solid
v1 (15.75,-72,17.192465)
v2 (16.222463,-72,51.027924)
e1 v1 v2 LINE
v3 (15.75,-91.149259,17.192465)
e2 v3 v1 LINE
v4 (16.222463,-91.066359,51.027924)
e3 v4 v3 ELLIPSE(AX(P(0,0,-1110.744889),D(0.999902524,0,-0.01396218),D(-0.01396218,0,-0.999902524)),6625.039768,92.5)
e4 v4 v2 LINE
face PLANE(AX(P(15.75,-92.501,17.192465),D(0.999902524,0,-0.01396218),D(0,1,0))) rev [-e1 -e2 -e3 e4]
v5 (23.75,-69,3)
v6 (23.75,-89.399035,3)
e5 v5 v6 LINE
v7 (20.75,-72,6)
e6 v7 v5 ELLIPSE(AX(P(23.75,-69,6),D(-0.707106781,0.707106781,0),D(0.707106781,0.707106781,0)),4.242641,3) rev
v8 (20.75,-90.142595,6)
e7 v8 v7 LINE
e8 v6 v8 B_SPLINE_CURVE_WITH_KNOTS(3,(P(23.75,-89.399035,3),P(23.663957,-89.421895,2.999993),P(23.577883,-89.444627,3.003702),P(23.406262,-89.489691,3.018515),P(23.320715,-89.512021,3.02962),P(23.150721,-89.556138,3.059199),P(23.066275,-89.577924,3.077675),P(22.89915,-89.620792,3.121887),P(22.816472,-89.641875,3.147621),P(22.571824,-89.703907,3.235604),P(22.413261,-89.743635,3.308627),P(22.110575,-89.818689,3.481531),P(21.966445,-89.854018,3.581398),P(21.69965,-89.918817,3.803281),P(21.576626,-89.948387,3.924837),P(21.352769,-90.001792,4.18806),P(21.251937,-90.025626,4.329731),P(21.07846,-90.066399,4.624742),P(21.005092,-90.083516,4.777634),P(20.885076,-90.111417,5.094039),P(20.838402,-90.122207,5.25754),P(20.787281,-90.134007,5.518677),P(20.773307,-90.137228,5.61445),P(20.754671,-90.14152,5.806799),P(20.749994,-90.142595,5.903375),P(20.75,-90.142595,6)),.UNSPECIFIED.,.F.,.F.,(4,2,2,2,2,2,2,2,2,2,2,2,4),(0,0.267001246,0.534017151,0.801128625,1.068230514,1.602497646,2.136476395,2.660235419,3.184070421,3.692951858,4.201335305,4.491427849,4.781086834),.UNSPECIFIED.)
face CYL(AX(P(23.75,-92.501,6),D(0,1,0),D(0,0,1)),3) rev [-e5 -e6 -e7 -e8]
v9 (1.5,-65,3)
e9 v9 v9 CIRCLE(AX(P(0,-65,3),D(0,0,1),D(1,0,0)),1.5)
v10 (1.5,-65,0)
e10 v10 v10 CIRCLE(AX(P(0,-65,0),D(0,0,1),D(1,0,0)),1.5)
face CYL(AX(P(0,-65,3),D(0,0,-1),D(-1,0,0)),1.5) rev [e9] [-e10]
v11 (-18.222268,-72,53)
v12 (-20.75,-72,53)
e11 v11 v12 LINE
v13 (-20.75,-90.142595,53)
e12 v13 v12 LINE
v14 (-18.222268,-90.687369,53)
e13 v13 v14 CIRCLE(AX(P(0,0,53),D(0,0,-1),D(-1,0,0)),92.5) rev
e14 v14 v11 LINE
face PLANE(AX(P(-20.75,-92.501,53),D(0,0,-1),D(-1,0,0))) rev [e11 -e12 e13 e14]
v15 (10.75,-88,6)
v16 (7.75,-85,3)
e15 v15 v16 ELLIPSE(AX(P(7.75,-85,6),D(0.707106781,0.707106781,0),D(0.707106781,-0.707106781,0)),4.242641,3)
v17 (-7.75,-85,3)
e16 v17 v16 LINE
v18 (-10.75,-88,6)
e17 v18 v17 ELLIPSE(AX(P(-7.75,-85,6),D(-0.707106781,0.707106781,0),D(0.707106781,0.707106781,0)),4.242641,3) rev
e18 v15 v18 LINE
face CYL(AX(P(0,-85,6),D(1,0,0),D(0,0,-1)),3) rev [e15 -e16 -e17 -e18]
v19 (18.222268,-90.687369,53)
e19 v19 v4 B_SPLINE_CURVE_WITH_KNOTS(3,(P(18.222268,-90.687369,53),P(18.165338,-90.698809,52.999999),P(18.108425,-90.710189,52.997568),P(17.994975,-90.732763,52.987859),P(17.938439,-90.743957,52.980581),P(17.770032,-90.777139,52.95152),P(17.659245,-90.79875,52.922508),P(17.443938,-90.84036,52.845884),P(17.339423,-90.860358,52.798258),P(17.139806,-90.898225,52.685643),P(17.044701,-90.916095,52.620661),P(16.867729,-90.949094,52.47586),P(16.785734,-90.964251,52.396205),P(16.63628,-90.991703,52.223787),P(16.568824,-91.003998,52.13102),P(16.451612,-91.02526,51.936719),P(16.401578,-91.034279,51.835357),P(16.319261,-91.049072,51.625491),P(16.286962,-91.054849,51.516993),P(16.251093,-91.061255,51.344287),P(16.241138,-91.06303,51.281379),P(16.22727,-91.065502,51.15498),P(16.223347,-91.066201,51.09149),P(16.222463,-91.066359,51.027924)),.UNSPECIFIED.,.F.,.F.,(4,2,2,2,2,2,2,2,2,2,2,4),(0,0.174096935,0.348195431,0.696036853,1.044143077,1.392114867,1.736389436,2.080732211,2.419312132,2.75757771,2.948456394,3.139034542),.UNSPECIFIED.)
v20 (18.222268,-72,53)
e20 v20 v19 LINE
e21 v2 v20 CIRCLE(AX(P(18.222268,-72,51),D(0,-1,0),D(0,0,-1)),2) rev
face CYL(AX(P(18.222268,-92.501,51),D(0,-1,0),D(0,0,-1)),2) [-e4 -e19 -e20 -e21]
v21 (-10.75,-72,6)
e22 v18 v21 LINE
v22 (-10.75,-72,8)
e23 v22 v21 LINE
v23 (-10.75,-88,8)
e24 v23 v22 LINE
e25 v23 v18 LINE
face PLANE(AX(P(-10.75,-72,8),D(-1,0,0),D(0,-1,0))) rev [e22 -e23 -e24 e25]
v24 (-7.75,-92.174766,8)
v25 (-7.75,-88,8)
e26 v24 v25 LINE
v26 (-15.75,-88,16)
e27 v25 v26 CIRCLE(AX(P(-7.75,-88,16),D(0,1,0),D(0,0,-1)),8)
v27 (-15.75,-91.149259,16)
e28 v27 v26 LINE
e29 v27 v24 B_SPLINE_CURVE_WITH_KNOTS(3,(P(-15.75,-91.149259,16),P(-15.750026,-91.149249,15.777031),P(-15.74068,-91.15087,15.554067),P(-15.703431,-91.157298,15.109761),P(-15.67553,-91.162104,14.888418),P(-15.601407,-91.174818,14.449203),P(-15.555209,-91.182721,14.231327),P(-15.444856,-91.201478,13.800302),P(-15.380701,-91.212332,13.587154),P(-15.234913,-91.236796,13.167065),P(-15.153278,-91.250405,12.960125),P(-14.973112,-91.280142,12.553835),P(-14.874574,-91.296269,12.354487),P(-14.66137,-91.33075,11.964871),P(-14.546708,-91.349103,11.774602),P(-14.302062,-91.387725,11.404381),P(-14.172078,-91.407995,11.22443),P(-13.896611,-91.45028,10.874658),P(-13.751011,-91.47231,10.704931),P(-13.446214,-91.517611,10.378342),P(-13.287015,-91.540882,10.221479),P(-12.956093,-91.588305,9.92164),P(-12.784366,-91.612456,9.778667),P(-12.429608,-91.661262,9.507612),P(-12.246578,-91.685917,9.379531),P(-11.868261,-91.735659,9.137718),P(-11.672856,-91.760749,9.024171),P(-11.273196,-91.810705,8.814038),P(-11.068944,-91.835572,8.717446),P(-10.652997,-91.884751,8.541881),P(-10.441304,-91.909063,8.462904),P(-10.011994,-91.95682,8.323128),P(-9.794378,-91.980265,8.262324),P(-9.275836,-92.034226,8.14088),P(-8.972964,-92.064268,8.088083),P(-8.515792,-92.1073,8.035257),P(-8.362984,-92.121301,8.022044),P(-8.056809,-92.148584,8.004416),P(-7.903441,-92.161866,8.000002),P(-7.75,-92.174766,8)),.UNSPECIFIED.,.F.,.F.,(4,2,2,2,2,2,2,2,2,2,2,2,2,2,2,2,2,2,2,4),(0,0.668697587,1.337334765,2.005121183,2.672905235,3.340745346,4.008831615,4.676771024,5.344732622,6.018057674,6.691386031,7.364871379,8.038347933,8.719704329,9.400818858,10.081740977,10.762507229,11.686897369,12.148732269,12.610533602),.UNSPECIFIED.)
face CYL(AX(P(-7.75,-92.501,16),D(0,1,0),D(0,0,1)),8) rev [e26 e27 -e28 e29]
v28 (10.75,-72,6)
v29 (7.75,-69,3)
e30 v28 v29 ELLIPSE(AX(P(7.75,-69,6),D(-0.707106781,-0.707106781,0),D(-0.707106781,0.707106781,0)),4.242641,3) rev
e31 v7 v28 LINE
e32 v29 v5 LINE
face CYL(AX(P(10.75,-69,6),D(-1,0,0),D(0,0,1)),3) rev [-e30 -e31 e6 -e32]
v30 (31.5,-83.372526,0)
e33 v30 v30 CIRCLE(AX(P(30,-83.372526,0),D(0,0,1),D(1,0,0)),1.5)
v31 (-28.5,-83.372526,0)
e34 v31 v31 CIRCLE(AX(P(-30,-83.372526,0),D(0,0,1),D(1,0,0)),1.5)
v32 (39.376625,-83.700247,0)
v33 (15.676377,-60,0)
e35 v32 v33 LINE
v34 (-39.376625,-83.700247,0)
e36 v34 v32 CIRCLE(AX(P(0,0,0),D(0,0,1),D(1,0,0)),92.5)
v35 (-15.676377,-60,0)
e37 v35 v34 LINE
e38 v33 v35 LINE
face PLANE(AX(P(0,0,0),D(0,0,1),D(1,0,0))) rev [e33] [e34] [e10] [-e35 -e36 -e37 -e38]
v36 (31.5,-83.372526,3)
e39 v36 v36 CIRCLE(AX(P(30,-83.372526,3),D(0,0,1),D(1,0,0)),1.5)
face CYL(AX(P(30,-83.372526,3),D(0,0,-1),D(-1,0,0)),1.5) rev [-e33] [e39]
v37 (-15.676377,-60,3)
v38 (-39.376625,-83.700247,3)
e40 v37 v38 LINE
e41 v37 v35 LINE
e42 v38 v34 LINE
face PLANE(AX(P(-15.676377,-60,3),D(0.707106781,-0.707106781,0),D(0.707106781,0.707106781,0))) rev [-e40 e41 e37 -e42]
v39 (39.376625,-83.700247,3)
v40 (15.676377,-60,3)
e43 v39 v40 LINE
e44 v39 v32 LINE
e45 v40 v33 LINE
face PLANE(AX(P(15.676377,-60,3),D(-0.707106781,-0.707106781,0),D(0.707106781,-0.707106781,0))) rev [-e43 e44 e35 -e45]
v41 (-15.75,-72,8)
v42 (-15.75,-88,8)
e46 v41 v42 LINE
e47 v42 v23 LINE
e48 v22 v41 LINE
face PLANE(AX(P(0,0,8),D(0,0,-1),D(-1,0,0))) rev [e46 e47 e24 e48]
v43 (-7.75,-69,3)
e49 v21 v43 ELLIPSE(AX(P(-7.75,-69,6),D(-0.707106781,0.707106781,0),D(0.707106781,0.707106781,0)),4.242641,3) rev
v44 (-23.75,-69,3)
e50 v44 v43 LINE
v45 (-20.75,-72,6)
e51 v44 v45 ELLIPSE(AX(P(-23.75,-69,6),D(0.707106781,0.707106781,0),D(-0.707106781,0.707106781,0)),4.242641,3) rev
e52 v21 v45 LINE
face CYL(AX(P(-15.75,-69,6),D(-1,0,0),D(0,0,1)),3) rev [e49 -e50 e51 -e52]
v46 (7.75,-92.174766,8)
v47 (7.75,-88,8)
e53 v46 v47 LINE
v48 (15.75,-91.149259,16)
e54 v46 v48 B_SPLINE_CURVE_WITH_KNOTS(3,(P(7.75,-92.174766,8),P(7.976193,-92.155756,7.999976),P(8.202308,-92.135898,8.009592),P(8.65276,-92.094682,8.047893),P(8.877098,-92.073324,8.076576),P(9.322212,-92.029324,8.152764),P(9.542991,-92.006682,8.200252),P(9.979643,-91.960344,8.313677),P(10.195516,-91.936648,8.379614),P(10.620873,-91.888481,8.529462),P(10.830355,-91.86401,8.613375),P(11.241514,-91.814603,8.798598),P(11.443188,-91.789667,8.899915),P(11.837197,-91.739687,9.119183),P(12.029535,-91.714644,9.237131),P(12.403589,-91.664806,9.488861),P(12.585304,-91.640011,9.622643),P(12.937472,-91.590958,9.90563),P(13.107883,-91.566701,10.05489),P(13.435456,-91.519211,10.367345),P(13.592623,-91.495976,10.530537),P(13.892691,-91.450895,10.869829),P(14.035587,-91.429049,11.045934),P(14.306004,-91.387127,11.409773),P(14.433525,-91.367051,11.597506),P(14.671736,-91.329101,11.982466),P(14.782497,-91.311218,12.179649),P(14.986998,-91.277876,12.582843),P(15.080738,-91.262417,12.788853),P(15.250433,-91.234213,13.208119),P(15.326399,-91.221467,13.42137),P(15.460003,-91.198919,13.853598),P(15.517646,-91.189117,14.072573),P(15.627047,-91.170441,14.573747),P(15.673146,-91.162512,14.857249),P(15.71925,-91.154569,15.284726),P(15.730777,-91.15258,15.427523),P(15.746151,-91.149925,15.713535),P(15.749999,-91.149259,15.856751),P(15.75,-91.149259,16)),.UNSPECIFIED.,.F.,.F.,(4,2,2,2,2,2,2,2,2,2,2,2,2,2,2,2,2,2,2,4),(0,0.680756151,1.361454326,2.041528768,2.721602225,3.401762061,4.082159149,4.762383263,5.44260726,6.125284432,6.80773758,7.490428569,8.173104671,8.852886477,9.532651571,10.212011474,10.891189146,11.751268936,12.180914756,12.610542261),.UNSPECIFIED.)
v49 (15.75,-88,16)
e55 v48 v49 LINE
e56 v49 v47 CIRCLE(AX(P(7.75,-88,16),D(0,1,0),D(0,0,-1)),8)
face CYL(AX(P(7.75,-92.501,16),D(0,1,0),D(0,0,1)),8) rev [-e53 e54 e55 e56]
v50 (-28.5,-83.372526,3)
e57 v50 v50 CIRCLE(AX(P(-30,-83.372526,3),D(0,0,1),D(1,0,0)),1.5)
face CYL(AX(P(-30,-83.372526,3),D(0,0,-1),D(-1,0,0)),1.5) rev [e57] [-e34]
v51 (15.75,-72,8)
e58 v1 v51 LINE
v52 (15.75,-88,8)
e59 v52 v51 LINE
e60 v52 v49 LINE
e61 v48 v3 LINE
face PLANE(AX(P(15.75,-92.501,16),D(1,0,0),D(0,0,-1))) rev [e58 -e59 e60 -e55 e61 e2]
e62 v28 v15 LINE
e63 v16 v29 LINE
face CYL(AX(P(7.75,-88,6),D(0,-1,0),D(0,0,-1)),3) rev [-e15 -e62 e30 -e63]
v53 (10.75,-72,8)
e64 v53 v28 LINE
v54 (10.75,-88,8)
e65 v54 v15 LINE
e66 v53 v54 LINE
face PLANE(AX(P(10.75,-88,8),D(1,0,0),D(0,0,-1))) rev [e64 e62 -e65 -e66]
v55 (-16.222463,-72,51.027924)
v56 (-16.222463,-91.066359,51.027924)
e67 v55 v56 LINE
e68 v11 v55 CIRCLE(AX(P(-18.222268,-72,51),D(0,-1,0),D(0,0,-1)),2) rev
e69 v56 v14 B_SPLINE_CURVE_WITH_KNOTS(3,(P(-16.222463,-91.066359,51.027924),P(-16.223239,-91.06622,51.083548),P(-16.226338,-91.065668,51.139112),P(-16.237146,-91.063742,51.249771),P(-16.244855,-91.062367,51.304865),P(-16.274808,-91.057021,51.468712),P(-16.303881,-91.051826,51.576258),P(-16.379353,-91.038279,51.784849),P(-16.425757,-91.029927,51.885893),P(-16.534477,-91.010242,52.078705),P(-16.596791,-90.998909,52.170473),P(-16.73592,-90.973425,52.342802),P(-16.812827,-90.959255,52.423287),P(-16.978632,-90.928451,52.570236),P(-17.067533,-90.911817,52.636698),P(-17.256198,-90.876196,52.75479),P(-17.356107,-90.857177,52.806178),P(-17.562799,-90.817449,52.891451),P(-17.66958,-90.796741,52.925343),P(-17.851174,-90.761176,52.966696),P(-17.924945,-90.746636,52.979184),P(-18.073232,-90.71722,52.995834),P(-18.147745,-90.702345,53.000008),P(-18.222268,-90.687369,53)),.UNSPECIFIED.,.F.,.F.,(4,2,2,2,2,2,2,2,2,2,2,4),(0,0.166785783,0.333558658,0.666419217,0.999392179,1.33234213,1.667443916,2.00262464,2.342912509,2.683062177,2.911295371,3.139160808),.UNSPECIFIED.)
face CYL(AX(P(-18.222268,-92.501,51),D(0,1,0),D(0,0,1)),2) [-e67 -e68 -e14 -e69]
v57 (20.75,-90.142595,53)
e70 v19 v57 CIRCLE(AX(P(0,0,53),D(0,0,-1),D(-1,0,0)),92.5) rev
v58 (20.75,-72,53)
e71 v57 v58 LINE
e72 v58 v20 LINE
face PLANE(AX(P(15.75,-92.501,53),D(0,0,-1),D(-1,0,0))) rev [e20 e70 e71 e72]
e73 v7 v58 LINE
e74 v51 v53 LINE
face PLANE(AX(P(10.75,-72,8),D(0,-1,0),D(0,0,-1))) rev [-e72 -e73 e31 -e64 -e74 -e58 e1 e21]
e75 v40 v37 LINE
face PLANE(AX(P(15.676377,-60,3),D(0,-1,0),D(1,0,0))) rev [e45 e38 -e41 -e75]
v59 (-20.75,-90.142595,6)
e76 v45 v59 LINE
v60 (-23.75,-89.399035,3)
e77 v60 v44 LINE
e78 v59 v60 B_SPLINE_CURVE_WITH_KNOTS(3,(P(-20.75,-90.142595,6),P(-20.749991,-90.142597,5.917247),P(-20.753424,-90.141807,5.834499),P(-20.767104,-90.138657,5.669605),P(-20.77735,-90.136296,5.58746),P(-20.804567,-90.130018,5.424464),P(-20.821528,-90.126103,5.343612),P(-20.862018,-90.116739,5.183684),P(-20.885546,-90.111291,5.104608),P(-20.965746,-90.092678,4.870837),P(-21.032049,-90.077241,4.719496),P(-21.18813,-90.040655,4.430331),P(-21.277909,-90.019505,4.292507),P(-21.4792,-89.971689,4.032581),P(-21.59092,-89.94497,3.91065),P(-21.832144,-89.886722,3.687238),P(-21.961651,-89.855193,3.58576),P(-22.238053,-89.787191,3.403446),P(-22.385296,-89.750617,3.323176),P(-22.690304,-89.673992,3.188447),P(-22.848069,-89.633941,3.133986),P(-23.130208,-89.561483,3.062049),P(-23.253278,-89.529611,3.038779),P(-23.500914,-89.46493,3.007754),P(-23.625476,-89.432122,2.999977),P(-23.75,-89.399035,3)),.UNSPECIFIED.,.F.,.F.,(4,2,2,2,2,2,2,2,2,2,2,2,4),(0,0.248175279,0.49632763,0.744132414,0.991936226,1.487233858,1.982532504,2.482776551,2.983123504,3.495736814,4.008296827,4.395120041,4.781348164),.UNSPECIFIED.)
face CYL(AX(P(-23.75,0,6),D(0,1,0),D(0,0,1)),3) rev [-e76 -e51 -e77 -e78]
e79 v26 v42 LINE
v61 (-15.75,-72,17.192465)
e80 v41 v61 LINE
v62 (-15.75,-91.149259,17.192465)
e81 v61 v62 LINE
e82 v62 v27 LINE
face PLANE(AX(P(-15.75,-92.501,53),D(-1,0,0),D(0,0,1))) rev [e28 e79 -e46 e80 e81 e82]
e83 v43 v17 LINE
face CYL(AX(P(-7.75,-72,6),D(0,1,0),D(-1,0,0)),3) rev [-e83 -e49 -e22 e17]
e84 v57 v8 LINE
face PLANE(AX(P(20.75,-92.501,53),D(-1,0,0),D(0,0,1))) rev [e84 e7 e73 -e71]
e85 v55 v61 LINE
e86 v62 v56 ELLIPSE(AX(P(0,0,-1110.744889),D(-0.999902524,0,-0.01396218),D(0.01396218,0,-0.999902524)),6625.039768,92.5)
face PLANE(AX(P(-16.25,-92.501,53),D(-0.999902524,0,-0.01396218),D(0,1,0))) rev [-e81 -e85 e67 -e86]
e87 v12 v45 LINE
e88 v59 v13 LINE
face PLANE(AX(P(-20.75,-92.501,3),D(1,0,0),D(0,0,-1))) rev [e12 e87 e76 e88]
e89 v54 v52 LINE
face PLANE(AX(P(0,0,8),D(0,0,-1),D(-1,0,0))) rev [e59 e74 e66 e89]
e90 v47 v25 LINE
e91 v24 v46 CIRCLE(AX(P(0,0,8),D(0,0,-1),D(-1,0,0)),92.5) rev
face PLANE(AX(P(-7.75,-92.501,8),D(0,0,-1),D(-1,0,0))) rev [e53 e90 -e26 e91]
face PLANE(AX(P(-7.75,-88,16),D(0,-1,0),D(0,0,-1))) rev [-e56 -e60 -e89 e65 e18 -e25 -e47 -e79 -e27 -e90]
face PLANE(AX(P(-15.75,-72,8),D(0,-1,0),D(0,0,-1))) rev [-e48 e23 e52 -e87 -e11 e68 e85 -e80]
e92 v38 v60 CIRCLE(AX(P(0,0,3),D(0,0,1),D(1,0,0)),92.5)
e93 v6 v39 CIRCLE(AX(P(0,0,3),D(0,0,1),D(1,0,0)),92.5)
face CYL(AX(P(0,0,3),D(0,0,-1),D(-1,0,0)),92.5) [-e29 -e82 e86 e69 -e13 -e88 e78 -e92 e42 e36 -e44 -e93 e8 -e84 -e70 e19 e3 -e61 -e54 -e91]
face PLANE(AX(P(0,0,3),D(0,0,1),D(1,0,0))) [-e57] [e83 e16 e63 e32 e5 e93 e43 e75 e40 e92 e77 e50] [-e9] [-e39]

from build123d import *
from OCP.BRepFilletAPI import BRepFilletAPI_MakeChamfer

# Parameters (mm, degrees)
CROQUIS1_R                   = 1.5
SALIENTE_EXTRUIR1_DEPTH      = 3
SALIENTE_EXTRUIR2_DEPTH      = 5
SALIENTE_EXTRUIR3_REACH      = 50.975
SALIENTE_EXTRUIR3_END_RADIUS = 92.5
CROQUIS5_W                   = 5
CROQUIS5_H                   = 50
SALIENTE_EXTRUIR4_DEPTH      = 16
CHAFL_N1_SIZE                = 0.5
CHAFL_N1_SIZE2               = 35.80753506
REDONDEO1_R                  = 2
REDONDEO2_R                  = 3


with BuildPart() as part:
    # Croquis1 → Saliente-Extruir1 (new body)
    with BuildSketch(Plane.XY):
        with BuildLine():
            Line((15.676377407, -60), (-15.676377407, -60))
            Line((-15.676377407, -60), (-39.376624823, -83.700247416))
            ThreePointArc((-39.376624823, -83.700247416), (0, -92.5), (39.376624823, -83.700247416))
            Line((39.376624823, -83.700247416), (15.676377407, -60))
        make_face()
        with Locations((-30, -83.372525695)):
            Circle(CROQUIS1_R, mode=Mode.SUBTRACT)
        with Locations((30, -83.372525695)):
            Circle(CROQUIS1_R, mode=Mode.SUBTRACT)
        with Locations((0, -65)):
            Circle(CROQUIS1_R, mode=Mode.SUBTRACT)
    extrude(amount=SALIENTE_EXTRUIR1_DEPTH)

    # Croquis2 → Saliente-Extruir2 (add)
    with BuildSketch(Plane.XY.offset(3)):
        Polygon((-15.75, -80), (-15.75, -72), (-10.75, -72), (-10.75, -88), (-15.75, -88), align=None)
        Polygon((15.75, -80), (15.75, -88), (10.75, -88), (10.75, -72), (15.75, -72), align=None)
    extrude(amount=SALIENTE_EXTRUIR2_DEPTH)

    # Saliente-Extruir3: up to this cylinder (the profile starts inside it)
    saliente_extruir3_end = Plane(origin=(0, 0, 34.5), z_dir=(0, 0, -1)) * Cylinder(SALIENTE_EXTRUIR3_END_RADIUS, 287.95, mode=Mode.PRIVATE)
    # Croquis4 → Saliente-Extruir3 (add, up to the surface)
    with BuildSketch(Plane.XZ.offset(88), mode=Mode.PRIVATE) as saliente_extruir3_sk1:
        with BuildLine():
            Line((-15.75, 3), (-20.75, 3))
            Line((-20.75, 3), (-20.75, 53))
            Line((-20.75, 53), (-15.75, 53))
            Line((-15.75, 53), (-15.75, 16))
            ThreePointArc((-15.75, 16), (-13.406854249, 10.343145751), (-7.75, 8))
            Line((-7.75, 8), (7.75, 8))
            ThreePointArc((7.75, 8), (13.406854249, 10.343145751), (15.75, 16))
            Line((15.75, 16), (15.75, 53))
            Line((15.75, 53), (20.75, 53))
            Line((20.75, 53), (20.75, 3))
            Line((20.75, 3), (-15.75, 3))
        make_face()
    saliente_extruir3_tool1 = extrude(saliente_extruir3_sk1.sketch, amount=SALIENTE_EXTRUIR3_REACH, mode=Mode.PRIVATE) & saliente_extruir3_end
    add(saliente_extruir3_tool1.solids().sort_by_distance((16.399788, -88, 34.5))[0])

    # Croquis5 → Saliente-Extruir4 (add)
    with BuildSketch(Plane(origin=(0, -88, 0), x_dir=(1, 0, 0), z_dir=(0, 1, 0))):
        with Locations((-18.25, -28)):
            Rectangle(CROQUIS5_W, CROQUIS5_H)
        with Locations((18.25, -28)):
            Rectangle(CROQUIS5_W, CROQUIS5_H)
    extrude(amount=SALIENTE_EXTRUIR4_DEPTH)

    # Chaflán1: one chamfer whose edges measure the first distance from different faces: ONE call of the kernel's chamfer builder (chamfer() names one face for all edges)
    chafl_n1_edges_1 = [part.edges().sort_by_distance(p)[0] for p in [
        (-15.75, -80, 53),
    ]]
    chafl_n1_side_1 = [part.faces().sort_by_distance(p)[0] for p in [
        (-18.25, -80, 53),
    ]]
    chafl_n1_edges_2 = [part.edges().sort_by_distance(p)[0] for p in [
        (15.75, -80, 53),
    ]]
    chafl_n1_side_2 = [part.faces().sort_by_distance(p)[0] for p in [
        (18.25, -80, 53),
    ]]
    chafl_n1 = BRepFilletAPI_MakeChamfer(part.part.solid().wrapped)
    for e in chafl_n1_edges_1:
        chafl_n1.Add(CHAFL_N1_SIZE, CHAFL_N1_SIZE2, e.wrapped, chafl_n1_side_1[0].wrapped)  # the first distance lies on this face
    for e in chafl_n1_edges_2:
        chafl_n1.Add(CHAFL_N1_SIZE, CHAFL_N1_SIZE2, e.wrapped, chafl_n1_side_2[0].wrapped)  # the first distance lies on this face
    add(Compound.cast(chafl_n1.Shape()), mode=Mode.REPLACE)

    # Redondeo1
    redondeo1_edges = [part.edges().sort_by_distance(p)[0] for p in [
        (16.25, -80, 53),
        (-16.25, -80, 53),
    ]]
    fillet(redondeo1_edges, radius=REDONDEO1_R)

    # Redondeo2
    # the kernel refuses this fillet: 3 mm, written as the material it adds along each edge
    with BuildSketch(Plane(origin=(10.75, -72, 3), x_dir=(0, 1, 0), z_dir=(1, 0, 0)), Plane(origin=(-15.75, -72, 3), x_dir=(0, 1, 0), z_dir=(1, 0, 0)), Plane(origin=(-20.75, -72, 3), x_dir=(0, 1, 0), z_dir=(1, 0, 0)), Plane(origin=(15.75, -72, 3), x_dir=(0, 1, 0), z_dir=(1, 0, 0))) as redondeo2_piece_1:
        with BuildLine():
            CenterArc((REDONDEO2_R, REDONDEO2_R), REDONDEO2_R, 180, 90)
            Line((0, REDONDEO2_R), (-REDONDEO2_R * 0.02, REDONDEO2_R))
            Line((-REDONDEO2_R * 0.02, REDONDEO2_R), (-REDONDEO2_R * 0.02, -REDONDEO2_R * 0.02))
            Line((-REDONDEO2_R * 0.02, -REDONDEO2_R * 0.02), (REDONDEO2_R, -REDONDEO2_R * 0.02))
            Line((REDONDEO2_R, -REDONDEO2_R * 0.02), (REDONDEO2_R, 0))
        make_face()
    extrude(amount=5)
    with BuildSketch(Plane(origin=(10.75, -88, 3), x_dir=(-1, 0, 0), z_dir=(0, 1, 0)), Plane(origin=(-10.75, -72, 3), x_dir=(1, 0, 0), z_dir=(0, -1, 0)), Plane(origin=(-20.75, -88, 3), x_dir=(-1, 0, 0), z_dir=(0, 1, 0)), Plane(origin=(20.75, -88, 3), x_dir=(0, 0, 1), z_dir=(0, 1, 0))) as redondeo2_piece_2:
        with BuildLine():
            CenterArc((REDONDEO2_R, REDONDEO2_R), REDONDEO2_R, 180, 90)
            Line((0, REDONDEO2_R), (-REDONDEO2_R * 0.02, REDONDEO2_R))
            Line((-REDONDEO2_R * 0.02, REDONDEO2_R), (-REDONDEO2_R * 0.02, -REDONDEO2_R * 0.02))
            Line((-REDONDEO2_R * 0.02, -REDONDEO2_R * 0.02), (REDONDEO2_R, -REDONDEO2_R * 0.02))
            Line((REDONDEO2_R, -REDONDEO2_R * 0.02), (REDONDEO2_R, 0))
        make_face()
    extrude(amount=16)
    with BuildSketch(Plane(origin=(-10.75, -88, 3), x_dir=(0, 1, 0), z_dir=(1, 0, 0))) as redondeo2_piece_3:
        with BuildLine():
            CenterArc((REDONDEO2_R, REDONDEO2_R), REDONDEO2_R, 180, 90)
            Line((0, REDONDEO2_R), (-REDONDEO2_R * 0.02, REDONDEO2_R))
            Line((-REDONDEO2_R * 0.02, REDONDEO2_R), (-REDONDEO2_R * 0.02, -REDONDEO2_R * 0.02))
            Line((-REDONDEO2_R * 0.02, -REDONDEO2_R * 0.02), (REDONDEO2_R, -REDONDEO2_R * 0.02))
            Line((REDONDEO2_R, -REDONDEO2_R * 0.02), (REDONDEO2_R, 0))
        make_face()
    extrude(amount=21.5)
    with BuildSketch(Plane(origin=(20.75, -88, 3), x_dir=(0, 0, 1), z_dir=(0, -1, 0))) as redondeo2_piece_4_section:
        with BuildLine():
            CenterArc((REDONDEO2_R, -REDONDEO2_R), REDONDEO2_R, 90, 90)
            Line((0, -REDONDEO2_R), (-REDONDEO2_R * 0.02, -REDONDEO2_R))
            Line((-REDONDEO2_R * 0.02, -REDONDEO2_R), (-REDONDEO2_R * 0.02, REDONDEO2_R * 0.02))
            Line((-REDONDEO2_R * 0.02, REDONDEO2_R * 0.02), (REDONDEO2_R, REDONDEO2_R * 0.02))
            Line((REDONDEO2_R, REDONDEO2_R * 0.02), (REDONDEO2_R, 0))
        make_face()
    redondeo2_piece_4 = extrude(amount=9.64259537, mode=Mode.PRIVATE)
    redondeo2_piece_4 = redondeo2_piece_4 & Plane(origin=(0, 0, 3.709191114), x_dir=(-1, 0, 0), z_dir=(0, 0, -1)) * Cylinder(92.5, 32, mode=Mode.PRIVATE)
    add(redondeo2_piece_4)
    with BuildSketch(Plane(origin=(-20.75, -88, 3), x_dir=(0, 0, 1), z_dir=(0, -1, 0))) as redondeo2_piece_5_section:
        with BuildLine():
            CenterArc((REDONDEO2_R, REDONDEO2_R), REDONDEO2_R, 180, 90)
            Line((0, REDONDEO2_R), (-REDONDEO2_R * 0.02, REDONDEO2_R))
            Line((-REDONDEO2_R * 0.02, REDONDEO2_R), (-REDONDEO2_R * 0.02, -REDONDEO2_R * 0.02))
            Line((-REDONDEO2_R * 0.02, -REDONDEO2_R * 0.02), (REDONDEO2_R, -REDONDEO2_R * 0.02))
            Line((REDONDEO2_R, -REDONDEO2_R * 0.02), (REDONDEO2_R, 0))
        make_face()
    redondeo2_piece_5 = extrude(amount=9.64259537, mode=Mode.PRIVATE)
    redondeo2_piece_5 = redondeo2_piece_5 & Plane(origin=(0, 0, 3.709191539), x_dir=(-1, 0, 0), z_dir=(0, 0, -1)) * Cylinder(92.5, 32, mode=Mode.PRIVATE)
    add(redondeo2_piece_5)
    with BuildSketch(Plane(origin=(3.25, -72, 3), x_dir=(0, 1, 0), z_dir=(1, 0, 0))) as redondeo2_piece_6a_section:
        with BuildLine():
            CenterArc((REDONDEO2_R, REDONDEO2_R), REDONDEO2_R, 180, 90)
            Line((0, REDONDEO2_R), (-REDONDEO2_R * 0.02, REDONDEO2_R))
            Line((-REDONDEO2_R * 0.02, REDONDEO2_R), (-REDONDEO2_R * 0.02, -REDONDEO2_R * 0.02))
            Line((-REDONDEO2_R * 0.02, -REDONDEO2_R * 0.02), (REDONDEO2_R, -REDONDEO2_R * 0.02))
            Line((REDONDEO2_R, -REDONDEO2_R * 0.02), (REDONDEO2_R, 0))
        make_face()
    redondeo2_piece_6a = extrude(amount=12.5, mode=Mode.PRIVATE)
    redondeo2_piece_6a = split(redondeo2_piece_6a, bisect_by=Plane(origin=(10.75, -71.320814657, 3.679185343), z_dir=(-1, 0, 0)), keep=Keep.TOP, mode=Mode.PRIVATE)
    with BuildSketch(Plane(origin=(10.75, -88, 3), x_dir=(-1, 0, 0), z_dir=(0, 1, 0))) as redondeo2_piece_6b_section:
        with BuildLine():
            CenterArc((REDONDEO2_R, REDONDEO2_R), REDONDEO2_R, 180, 90)
            Line((0, REDONDEO2_R), (-REDONDEO2_R * 0.02, REDONDEO2_R))
            Line((-REDONDEO2_R * 0.02, REDONDEO2_R), (-REDONDEO2_R * 0.02, -REDONDEO2_R * 0.02))
            Line((-REDONDEO2_R * 0.02, -REDONDEO2_R * 0.02), (REDONDEO2_R, -REDONDEO2_R * 0.02))
            Line((REDONDEO2_R, -REDONDEO2_R * 0.02), (REDONDEO2_R, 0))
        make_face()
    redondeo2_piece_6b = extrude(amount=23.5, mode=Mode.PRIVATE)
    redondeo2_piece_6b = split(redondeo2_piece_6b, bisect_by=Plane(origin=(10.070814657, -72, 3.679185343), z_dir=(0, 1, 0)), keep=Keep.TOP, mode=Mode.PRIVATE)
    redondeo2_piece_6 = redondeo2_piece_6a & redondeo2_piece_6b
    add(redondeo2_piece_6)
    with BuildSketch(Plane(origin=(10.75, -95.5, 3), x_dir=(-1, 0, 0), z_dir=(0, 1, 0))) as redondeo2_piece_7a_section:
        with BuildLine():
            CenterArc((REDONDEO2_R, REDONDEO2_R), REDONDEO2_R, 180, 90)
            Line((0, REDONDEO2_R), (-REDONDEO2_R * 0.02, REDONDEO2_R))
            Line((-REDONDEO2_R * 0.02, REDONDEO2_R), (-REDONDEO2_R * 0.02, -REDONDEO2_R * 0.02))
            Line((-REDONDEO2_R * 0.02, -REDONDEO2_R * 0.02), (REDONDEO2_R, -REDONDEO2_R * 0.02))
            Line((REDONDEO2_R, -REDONDEO2_R * 0.02), (REDONDEO2_R, 0))
        make_face()
    redondeo2_piece_7a = extrude(amount=23.5, mode=Mode.PRIVATE)
    redondeo2_piece_7a = split(redondeo2_piece_7a, bisect_by=Plane(origin=(10.070814657, -88, 3.679185343), z_dir=(0, -1, 0)), keep=Keep.TOP, mode=Mode.PRIVATE)
    with BuildSketch(Plane(origin=(-10.75, -88, 3), x_dir=(0, 1, 0), z_dir=(1, 0, 0))) as redondeo2_piece_7b_section:
        with BuildLine():
            CenterArc((REDONDEO2_R, REDONDEO2_R), REDONDEO2_R, 180, 90)
            Line((0, REDONDEO2_R), (-REDONDEO2_R * 0.02, REDONDEO2_R))
            Line((-REDONDEO2_R * 0.02, REDONDEO2_R), (-REDONDEO2_R * 0.02, -REDONDEO2_R * 0.02))
            Line((-REDONDEO2_R * 0.02, -REDONDEO2_R * 0.02), (REDONDEO2_R, -REDONDEO2_R * 0.02))
            Line((REDONDEO2_R, -REDONDEO2_R * 0.02), (REDONDEO2_R, 0))
        make_face()
    redondeo2_piece_7b = extrude(amount=29, mode=Mode.PRIVATE)
    redondeo2_piece_7b = split(redondeo2_piece_7b, bisect_by=Plane(origin=(10.75, -87.320814657, 3.679185343), z_dir=(1, 0, 0)), keep=Keep.TOP, mode=Mode.PRIVATE)
    redondeo2_piece_7 = redondeo2_piece_7a & redondeo2_piece_7b
    add(redondeo2_piece_7)
    with BuildSketch(Plane(origin=(-10.75, -64.5, 3), x_dir=(1, 0, 0), z_dir=(0, -1, 0))) as redondeo2_piece_8a_section:
        with BuildLine():
            CenterArc((REDONDEO2_R, REDONDEO2_R), REDONDEO2_R, 180, 90)
            Line((0, REDONDEO2_R), (-REDONDEO2_R * 0.02, REDONDEO2_R))
            Line((-REDONDEO2_R * 0.02, REDONDEO2_R), (-REDONDEO2_R * 0.02, -REDONDEO2_R * 0.02))
            Line((-REDONDEO2_R * 0.02, -REDONDEO2_R * 0.02), (REDONDEO2_R, -REDONDEO2_R * 0.02))
            Line((REDONDEO2_R, -REDONDEO2_R * 0.02), (REDONDEO2_R, 0))
        make_face()
    redondeo2_piece_8a = extrude(amount=23.5, mode=Mode.PRIVATE)
    redondeo2_piece_8a = split(redondeo2_piece_8a, bisect_by=Plane(origin=(-10.070814657, -72, 3.679185343), z_dir=(0, 1, 0)), keep=Keep.TOP, mode=Mode.PRIVATE)
    with BuildSketch(Plane(origin=(-15.75, -72, 3), x_dir=(0, 1, 0), z_dir=(1, 0, 0))) as redondeo2_piece_8b_section:
        with BuildLine():
            CenterArc((REDONDEO2_R, REDONDEO2_R), REDONDEO2_R, 180, 90)
            Line((0, REDONDEO2_R), (-REDONDEO2_R * 0.02, REDONDEO2_R))
            Line((-REDONDEO2_R * 0.02, REDONDEO2_R), (-REDONDEO2_R * 0.02, -REDONDEO2_R * 0.02))
            Line((-REDONDEO2_R * 0.02, -REDONDEO2_R * 0.02), (REDONDEO2_R, -REDONDEO2_R * 0.02))
            Line((REDONDEO2_R, -REDONDEO2_R * 0.02), (REDONDEO2_R, 0))
        make_face()
    redondeo2_piece_8b = extrude(amount=12.5, mode=Mode.PRIVATE)
    redondeo2_piece_8b = split(redondeo2_piece_8b, bisect_by=Plane(origin=(-10.75, -71.320814657, 3.679185343), z_dir=(1, 0, 0)), keep=Keep.TOP, mode=Mode.PRIVATE)
    redondeo2_piece_8 = redondeo2_piece_8a & redondeo2_piece_8b
    add(redondeo2_piece_8)
    with BuildSketch(Plane(origin=(-18.25, -88, 3), x_dir=(0, 1, 0), z_dir=(1, 0, 0))) as redondeo2_piece_9a_section:
        with BuildLine():
            CenterArc((REDONDEO2_R, REDONDEO2_R), REDONDEO2_R, 180, 90)
            Line((0, REDONDEO2_R), (-REDONDEO2_R * 0.02, REDONDEO2_R))
            Line((-REDONDEO2_R * 0.02, REDONDEO2_R), (-REDONDEO2_R * 0.02, -REDONDEO2_R * 0.02))
            Line((-REDONDEO2_R * 0.02, -REDONDEO2_R * 0.02), (REDONDEO2_R, -REDONDEO2_R * 0.02))
            Line((REDONDEO2_R, -REDONDEO2_R * 0.02), (REDONDEO2_R, 0))
        make_face()
    redondeo2_piece_9a = extrude(amount=29, mode=Mode.PRIVATE)
    redondeo2_piece_9a = split(redondeo2_piece_9a, bisect_by=Plane(origin=(-10.75, -87.320814657, 3.679185343), z_dir=(-1, 0, 0)), keep=Keep.TOP, mode=Mode.PRIVATE)
    with BuildSketch(Plane(origin=(-10.75, -72, 3), x_dir=(1, 0, 0), z_dir=(0, -1, 0))) as redondeo2_piece_9b_section:
        with BuildLine():
            CenterArc((REDONDEO2_R, REDONDEO2_R), REDONDEO2_R, 180, 90)
            Line((0, REDONDEO2_R), (-REDONDEO2_R * 0.02, REDONDEO2_R))
            Line((-REDONDEO2_R * 0.02, REDONDEO2_R), (-REDONDEO2_R * 0.02, -REDONDEO2_R * 0.02))
            Line((-REDONDEO2_R * 0.02, -REDONDEO2_R * 0.02), (REDONDEO2_R, -REDONDEO2_R * 0.02))
            Line((REDONDEO2_R, -REDONDEO2_R * 0.02), (REDONDEO2_R, 0))
        make_face()
    redondeo2_piece_9b = extrude(amount=23.5, mode=Mode.PRIVATE)
    redondeo2_piece_9b = split(redondeo2_piece_9b, bisect_by=Plane(origin=(-10.070814657, -88, 3.679185343), z_dir=(0, -1, 0)), keep=Keep.TOP, mode=Mode.PRIVATE)
    redondeo2_piece_9 = redondeo2_piece_9a & redondeo2_piece_9b
    add(redondeo2_piece_9)
    with BuildSketch(Plane(origin=(-28.25, -72, 3), x_dir=(0, 1, 0), z_dir=(1, 0, 0))) as redondeo2_piece_10a_section:
        with BuildLine():
            CenterArc((REDONDEO2_R, REDONDEO2_R), REDONDEO2_R, 180, 90)
            Line((0, REDONDEO2_R), (-REDONDEO2_R * 0.02, REDONDEO2_R))
            Line((-REDONDEO2_R * 0.02, REDONDEO2_R), (-REDONDEO2_R * 0.02, -REDONDEO2_R * 0.02))
            Line((-REDONDEO2_R * 0.02, -REDONDEO2_R * 0.02), (REDONDEO2_R, -REDONDEO2_R * 0.02))
            Line((REDONDEO2_R, -REDONDEO2_R * 0.02), (REDONDEO2_R, 0))
        make_face()
    redondeo2_piece_10a = extrude(amount=12.5, mode=Mode.PRIVATE)
    redondeo2_piece_10a = split(redondeo2_piece_10a, bisect_by=Plane(origin=(-25.485611377, -69.809233969, 3.718740777), z_dir=(0.707106781186549, -0.7071067811865461, 0)), keep=Keep.TOP, mode=Mode.PRIVATE)
    redondeo2_piece_10a = split(redondeo2_piece_10a, bisect_by=Plane(origin=(-20.75, -71.387771095, 3.718740777), z_dir=(-1, 0, 0)), keep=Keep.TOP, mode=Mode.PRIVATE)
    with BuildSketch(Plane(origin=(-20.75, -88, 3), x_dir=(-1, 0, 0), z_dir=(0, 1, 0))) as redondeo2_piece_10b_section:
        with BuildLine():
            CenterArc((REDONDEO2_R, REDONDEO2_R), REDONDEO2_R, 180, 90)
            Line((0, REDONDEO2_R), (-REDONDEO2_R * 0.02, REDONDEO2_R))
            Line((-REDONDEO2_R * 0.02, REDONDEO2_R), (-REDONDEO2_R * 0.02, -REDONDEO2_R * 0.02))
            Line((-REDONDEO2_R * 0.02, -REDONDEO2_R * 0.02), (REDONDEO2_R, -REDONDEO2_R * 0.02))
            Line((REDONDEO2_R, -REDONDEO2_R * 0.02), (REDONDEO2_R, 0))
        make_face()
    redondeo2_piece_10b = extrude(amount=23.5, mode=Mode.PRIVATE)
    redondeo2_piece_10b = split(redondeo2_piece_10b, bisect_by=Plane(origin=(-22.940766031, -67.264388623, 3.718740777), z_dir=(0.707106781186549, -0.7071067811865461, 0)), keep=Keep.TOP, mode=Mode.PRIVATE)
    redondeo2_piece_10b = split(redondeo2_piece_10b, bisect_by=Plane(origin=(-21.362228905, -72, 3.718740777), z_dir=(0, 1, 0)), keep=Keep.TOP, mode=Mode.PRIVATE)
    redondeo2_piece_10 = redondeo2_piece_10a & redondeo2_piece_10b
    add(redondeo2_piece_10)
    with BuildSketch(Plane(origin=(20.75, -88, 3), x_dir=(0, 0, 1), z_dir=(0, 1, 0))) as redondeo2_piece_11a_section:
        with BuildLine():
            CenterArc((REDONDEO2_R, REDONDEO2_R), REDONDEO2_R, 180, 90)
            Line((0, REDONDEO2_R), (-REDONDEO2_R * 0.02, REDONDEO2_R))
            Line((-REDONDEO2_R * 0.02, REDONDEO2_R), (-REDONDEO2_R * 0.02, -REDONDEO2_R * 0.02))
            Line((-REDONDEO2_R * 0.02, -REDONDEO2_R * 0.02), (REDONDEO2_R, -REDONDEO2_R * 0.02))
            Line((REDONDEO2_R, -REDONDEO2_R * 0.02), (REDONDEO2_R, 0))
        make_face()
    redondeo2_piece_11a = extrude(amount=23.5, mode=Mode.PRIVATE)
    redondeo2_piece_11a = split(redondeo2_piece_11a, bisect_by=Plane(origin=(21.362228905, -72, 3.718740777), z_dir=(0, 1, 0)), keep=Keep.TOP, mode=Mode.PRIVATE)
    redondeo2_piece_11a = split(redondeo2_piece_11a, bisect_by=Plane(origin=(22.940766031, -67.264388623, 3.718740777), z_dir=(-0.7071067811865434, -0.7071067811865517, 0)), keep=Keep.TOP, mode=Mode.PRIVATE)
    with BuildSketch(Plane(origin=(15.75, -72, 3), x_dir=(0, 1, 0), z_dir=(1, 0, 0))) as redondeo2_piece_11b_section:
        with BuildLine():
            CenterArc((REDONDEO2_R, REDONDEO2_R), REDONDEO2_R, 180, 90)
            Line((0, REDONDEO2_R), (-REDONDEO2_R * 0.02, REDONDEO2_R))
            Line((-REDONDEO2_R * 0.02, REDONDEO2_R), (-REDONDEO2_R * 0.02, -REDONDEO2_R * 0.02))
            Line((-REDONDEO2_R * 0.02, -REDONDEO2_R * 0.02), (REDONDEO2_R, -REDONDEO2_R * 0.02))
            Line((REDONDEO2_R, -REDONDEO2_R * 0.02), (REDONDEO2_R, 0))
        make_face()
    redondeo2_piece_11b = extrude(amount=12.5, mode=Mode.PRIVATE)
    redondeo2_piece_11b = split(redondeo2_piece_11b, bisect_by=Plane(origin=(20.75, -71.387771095, 3.718740777), z_dir=(1, 0, 0)), keep=Keep.TOP, mode=Mode.PRIVATE)
    redondeo2_piece_11b = split(redondeo2_piece_11b, bisect_by=Plane(origin=(25.485611377, -69.809233969, 3.718740777), z_dir=(-0.7071067811865434, -0.7071067811865517, 0)), keep=Keep.TOP, mode=Mode.PRIVATE)
    redondeo2_piece_11 = redondeo2_piece_11a & redondeo2_piece_11b
    add(redondeo2_piece_11)


solid = part.part
